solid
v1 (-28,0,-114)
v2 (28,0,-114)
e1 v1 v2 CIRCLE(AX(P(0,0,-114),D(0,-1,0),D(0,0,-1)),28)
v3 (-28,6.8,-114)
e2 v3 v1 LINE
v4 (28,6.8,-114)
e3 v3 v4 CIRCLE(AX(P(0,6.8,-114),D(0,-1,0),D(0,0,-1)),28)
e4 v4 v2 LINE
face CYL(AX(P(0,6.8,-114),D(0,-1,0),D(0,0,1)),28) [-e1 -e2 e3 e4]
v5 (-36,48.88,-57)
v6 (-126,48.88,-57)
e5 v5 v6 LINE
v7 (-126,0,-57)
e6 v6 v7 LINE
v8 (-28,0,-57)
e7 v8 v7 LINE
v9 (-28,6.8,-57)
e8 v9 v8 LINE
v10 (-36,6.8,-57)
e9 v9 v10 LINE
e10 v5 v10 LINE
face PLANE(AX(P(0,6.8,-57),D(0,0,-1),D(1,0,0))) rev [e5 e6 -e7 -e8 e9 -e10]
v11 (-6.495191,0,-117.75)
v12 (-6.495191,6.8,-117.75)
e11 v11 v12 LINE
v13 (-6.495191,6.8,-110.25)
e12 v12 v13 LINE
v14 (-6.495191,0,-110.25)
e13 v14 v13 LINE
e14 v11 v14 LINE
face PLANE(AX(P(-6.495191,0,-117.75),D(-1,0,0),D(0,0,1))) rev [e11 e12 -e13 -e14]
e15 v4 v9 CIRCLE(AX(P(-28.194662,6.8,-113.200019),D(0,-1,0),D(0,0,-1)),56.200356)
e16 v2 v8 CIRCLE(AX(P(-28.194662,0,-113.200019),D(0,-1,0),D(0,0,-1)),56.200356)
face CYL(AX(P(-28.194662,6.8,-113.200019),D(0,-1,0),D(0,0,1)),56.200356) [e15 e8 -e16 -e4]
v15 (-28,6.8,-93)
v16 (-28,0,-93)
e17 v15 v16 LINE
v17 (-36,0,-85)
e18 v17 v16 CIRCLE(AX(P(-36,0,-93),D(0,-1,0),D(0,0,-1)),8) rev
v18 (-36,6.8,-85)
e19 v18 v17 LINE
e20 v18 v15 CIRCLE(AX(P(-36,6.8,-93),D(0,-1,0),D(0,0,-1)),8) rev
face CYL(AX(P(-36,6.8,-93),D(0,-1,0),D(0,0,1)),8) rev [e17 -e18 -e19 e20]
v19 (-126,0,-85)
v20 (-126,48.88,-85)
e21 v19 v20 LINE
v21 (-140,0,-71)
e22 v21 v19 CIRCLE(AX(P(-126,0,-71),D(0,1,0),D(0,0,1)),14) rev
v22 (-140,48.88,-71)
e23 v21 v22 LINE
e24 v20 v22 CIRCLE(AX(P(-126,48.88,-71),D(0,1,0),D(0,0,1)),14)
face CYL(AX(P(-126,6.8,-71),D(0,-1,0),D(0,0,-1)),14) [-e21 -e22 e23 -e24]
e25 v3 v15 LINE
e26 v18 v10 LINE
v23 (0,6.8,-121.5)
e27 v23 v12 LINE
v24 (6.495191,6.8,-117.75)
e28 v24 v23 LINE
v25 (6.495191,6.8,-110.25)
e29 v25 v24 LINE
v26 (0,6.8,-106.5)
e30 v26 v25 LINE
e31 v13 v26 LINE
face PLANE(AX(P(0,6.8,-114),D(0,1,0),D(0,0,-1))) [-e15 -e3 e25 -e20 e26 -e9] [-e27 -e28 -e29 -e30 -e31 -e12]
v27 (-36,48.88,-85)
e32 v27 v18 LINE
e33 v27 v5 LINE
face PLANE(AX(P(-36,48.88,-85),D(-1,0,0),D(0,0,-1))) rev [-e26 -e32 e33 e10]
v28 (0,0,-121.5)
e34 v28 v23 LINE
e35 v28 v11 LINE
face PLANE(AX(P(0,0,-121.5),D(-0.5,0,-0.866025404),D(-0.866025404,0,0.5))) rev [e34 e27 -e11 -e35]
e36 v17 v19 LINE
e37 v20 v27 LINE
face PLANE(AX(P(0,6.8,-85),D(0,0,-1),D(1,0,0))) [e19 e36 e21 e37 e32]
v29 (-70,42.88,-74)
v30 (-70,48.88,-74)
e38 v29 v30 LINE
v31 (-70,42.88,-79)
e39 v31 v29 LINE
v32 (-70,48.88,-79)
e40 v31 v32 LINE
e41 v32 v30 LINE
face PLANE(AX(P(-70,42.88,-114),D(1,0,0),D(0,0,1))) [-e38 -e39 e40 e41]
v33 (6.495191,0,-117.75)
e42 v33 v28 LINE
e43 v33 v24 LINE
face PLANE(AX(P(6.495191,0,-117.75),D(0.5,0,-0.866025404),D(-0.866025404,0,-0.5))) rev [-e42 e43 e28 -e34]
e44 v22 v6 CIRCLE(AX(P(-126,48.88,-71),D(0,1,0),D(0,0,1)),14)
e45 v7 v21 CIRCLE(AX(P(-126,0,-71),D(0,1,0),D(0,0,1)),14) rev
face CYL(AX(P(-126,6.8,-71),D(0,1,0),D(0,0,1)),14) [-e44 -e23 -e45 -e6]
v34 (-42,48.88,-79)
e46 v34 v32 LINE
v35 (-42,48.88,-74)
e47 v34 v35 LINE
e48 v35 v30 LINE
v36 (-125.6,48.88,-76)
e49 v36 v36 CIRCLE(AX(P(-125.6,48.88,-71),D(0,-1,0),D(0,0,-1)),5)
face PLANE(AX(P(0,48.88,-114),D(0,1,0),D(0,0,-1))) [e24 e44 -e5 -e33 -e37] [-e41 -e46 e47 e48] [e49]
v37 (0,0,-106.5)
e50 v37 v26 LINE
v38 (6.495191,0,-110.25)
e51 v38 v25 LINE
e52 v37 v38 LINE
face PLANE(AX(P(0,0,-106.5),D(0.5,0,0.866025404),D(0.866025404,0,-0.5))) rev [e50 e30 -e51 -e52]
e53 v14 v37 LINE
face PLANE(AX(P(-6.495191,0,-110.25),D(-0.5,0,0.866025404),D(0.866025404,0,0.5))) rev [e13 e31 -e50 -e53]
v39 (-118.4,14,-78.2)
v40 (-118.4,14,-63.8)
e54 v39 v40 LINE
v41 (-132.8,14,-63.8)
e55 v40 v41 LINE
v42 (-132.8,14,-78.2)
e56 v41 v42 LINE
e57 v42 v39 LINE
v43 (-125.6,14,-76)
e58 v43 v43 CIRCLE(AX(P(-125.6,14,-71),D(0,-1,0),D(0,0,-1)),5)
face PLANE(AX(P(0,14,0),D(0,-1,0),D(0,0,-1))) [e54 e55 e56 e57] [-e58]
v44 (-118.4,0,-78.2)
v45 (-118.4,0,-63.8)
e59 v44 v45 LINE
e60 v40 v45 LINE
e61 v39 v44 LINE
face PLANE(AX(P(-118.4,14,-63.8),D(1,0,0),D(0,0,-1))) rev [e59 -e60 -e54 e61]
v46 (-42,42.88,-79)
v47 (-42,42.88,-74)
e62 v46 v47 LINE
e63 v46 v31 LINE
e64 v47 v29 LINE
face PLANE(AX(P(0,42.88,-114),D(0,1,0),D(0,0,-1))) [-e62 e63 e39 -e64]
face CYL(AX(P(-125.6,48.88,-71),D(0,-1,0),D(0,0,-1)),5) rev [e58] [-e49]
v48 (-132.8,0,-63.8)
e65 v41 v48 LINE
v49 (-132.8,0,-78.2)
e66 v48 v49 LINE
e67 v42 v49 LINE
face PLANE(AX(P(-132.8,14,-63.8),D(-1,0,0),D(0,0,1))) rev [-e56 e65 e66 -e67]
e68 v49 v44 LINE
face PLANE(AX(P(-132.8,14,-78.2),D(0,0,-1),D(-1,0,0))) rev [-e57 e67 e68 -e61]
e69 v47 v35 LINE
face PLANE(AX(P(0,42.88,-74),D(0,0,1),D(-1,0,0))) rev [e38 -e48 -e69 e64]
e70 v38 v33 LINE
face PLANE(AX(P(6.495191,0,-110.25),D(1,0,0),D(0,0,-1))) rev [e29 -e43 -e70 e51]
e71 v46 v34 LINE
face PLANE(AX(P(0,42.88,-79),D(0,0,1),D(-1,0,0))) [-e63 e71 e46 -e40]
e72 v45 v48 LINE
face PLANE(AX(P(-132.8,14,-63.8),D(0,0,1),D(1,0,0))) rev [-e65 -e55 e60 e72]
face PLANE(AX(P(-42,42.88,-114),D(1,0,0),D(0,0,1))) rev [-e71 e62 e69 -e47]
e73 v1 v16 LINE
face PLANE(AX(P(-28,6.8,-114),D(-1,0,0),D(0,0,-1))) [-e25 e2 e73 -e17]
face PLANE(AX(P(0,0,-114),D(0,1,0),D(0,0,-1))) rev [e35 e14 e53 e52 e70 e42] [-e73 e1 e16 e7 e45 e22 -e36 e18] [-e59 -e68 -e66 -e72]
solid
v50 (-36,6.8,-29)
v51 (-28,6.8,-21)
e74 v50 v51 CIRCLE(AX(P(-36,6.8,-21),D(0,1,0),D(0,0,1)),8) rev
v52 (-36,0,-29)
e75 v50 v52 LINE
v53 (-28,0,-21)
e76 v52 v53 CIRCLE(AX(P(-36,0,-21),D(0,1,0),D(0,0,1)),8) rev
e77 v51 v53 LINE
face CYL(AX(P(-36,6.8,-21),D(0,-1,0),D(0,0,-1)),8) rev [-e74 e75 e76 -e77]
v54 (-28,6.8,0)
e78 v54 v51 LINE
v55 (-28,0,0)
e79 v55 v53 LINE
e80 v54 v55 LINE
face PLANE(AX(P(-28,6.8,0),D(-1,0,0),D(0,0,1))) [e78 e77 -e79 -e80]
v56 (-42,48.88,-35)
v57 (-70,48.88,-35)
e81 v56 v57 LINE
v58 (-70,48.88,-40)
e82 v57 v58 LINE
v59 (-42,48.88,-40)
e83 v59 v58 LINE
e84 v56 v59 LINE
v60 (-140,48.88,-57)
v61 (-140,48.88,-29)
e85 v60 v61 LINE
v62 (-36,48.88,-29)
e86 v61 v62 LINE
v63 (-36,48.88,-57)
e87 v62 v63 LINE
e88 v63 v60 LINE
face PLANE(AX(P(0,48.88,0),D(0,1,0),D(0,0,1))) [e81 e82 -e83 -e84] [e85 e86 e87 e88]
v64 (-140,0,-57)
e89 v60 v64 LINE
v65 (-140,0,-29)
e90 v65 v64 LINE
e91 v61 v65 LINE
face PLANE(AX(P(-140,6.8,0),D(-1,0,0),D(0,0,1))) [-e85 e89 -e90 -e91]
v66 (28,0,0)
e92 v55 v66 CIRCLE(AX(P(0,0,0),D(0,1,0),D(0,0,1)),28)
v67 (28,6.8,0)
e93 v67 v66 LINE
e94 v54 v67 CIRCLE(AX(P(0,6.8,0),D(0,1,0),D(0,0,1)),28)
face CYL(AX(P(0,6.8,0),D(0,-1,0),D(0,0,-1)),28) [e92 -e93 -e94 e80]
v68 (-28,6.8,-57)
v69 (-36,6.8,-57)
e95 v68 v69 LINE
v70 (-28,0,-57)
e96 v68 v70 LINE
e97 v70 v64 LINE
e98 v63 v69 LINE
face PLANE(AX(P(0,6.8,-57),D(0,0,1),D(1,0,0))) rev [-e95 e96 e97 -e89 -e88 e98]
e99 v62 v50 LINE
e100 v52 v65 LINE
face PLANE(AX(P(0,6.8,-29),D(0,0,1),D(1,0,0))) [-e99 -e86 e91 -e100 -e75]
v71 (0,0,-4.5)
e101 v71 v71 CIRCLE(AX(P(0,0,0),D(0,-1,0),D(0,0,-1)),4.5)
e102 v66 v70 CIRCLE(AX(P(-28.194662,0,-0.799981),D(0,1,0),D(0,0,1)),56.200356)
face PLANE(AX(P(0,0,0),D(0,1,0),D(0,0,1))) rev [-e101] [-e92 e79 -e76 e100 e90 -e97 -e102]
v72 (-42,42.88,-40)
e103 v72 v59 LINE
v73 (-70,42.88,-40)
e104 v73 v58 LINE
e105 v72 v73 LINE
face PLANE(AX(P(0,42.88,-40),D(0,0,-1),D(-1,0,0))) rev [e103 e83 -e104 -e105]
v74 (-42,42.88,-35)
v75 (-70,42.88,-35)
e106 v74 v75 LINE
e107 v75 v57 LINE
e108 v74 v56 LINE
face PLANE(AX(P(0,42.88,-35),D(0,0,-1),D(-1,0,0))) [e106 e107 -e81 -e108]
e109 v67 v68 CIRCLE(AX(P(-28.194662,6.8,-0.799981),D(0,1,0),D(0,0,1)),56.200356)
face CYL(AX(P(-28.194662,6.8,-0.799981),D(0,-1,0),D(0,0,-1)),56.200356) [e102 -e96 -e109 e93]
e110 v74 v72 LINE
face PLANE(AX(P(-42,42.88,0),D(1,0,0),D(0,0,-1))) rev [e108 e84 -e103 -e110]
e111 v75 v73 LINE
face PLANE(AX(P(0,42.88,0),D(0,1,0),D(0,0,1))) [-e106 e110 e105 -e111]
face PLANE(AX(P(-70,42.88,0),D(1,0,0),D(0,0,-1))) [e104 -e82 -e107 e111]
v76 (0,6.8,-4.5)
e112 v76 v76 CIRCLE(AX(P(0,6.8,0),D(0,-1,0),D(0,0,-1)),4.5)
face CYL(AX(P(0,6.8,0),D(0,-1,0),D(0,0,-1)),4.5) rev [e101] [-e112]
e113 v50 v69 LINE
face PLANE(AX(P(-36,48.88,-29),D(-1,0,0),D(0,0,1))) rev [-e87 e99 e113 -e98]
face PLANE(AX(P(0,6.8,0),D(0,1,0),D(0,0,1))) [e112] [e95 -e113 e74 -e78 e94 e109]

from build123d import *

# Parameters (mm, degrees)
EXTRUDE_1_DEPTH     = 6.8
SKETCH_3_R          = 4.5
CUT_EXTRUDE_1_DEPTH = 152.311731204
SKETCH_5_W          = 104
SKETCH_5_H          = 28
EXTRUDE_3_DEPTH     = 42.08
SKETCH_6_W          = 28
SKETCH_6_H          = 5
CUT_EXTRUDE_3_DEPTH = 6
CUT_EXTRUDE_4_DEPTH = 204.800702648
SKETCH_8_W          = 14.4
SKETCH_8_H          = 14.4
CUT_EXTRUDE_5_DEPTH = 14
SKETCH_9_R          = 5
CUT_EXTRUDE_6_DEPTH = 203.436692326
FILLET_1_R          = 14


with BuildPart() as part:
    # Эскиз1 → Бобышка-Вытянуть1 (new body)
    with BuildSketch(Plane(origin=(0, 0, 0), x_dir=(1, 0, 0), z_dir=(0, 1, 0))):
        with BuildLine():
            ThreePointArc((-28, 0), (0, -28), (28, 0))
            ThreePointArc((28, 0), (11.895099372, 40.186413418), (-28, 57))
            Line((-28, 57), (-140, 57))
            Line((-140, 57), (-140, 29))
            Line((-140, 29), (-36, 29))
            ThreePointArc((-36, 29), (-30.343145751, 26.656854249), (-28, 21))
            Line((-28, 21), (-28, 0))
        make_face()
    extrude(amount=EXTRUDE_1_DEPTH)

    # Эскиз3 → Вырез-Вытянуть1 (cut, through all)
    with BuildSketch(Plane(origin=(0, 0, 0), x_dir=(-1, 0, 0), z_dir=(0, -1, 0))):
        with Locations(Location((0, 0, 0), (0, 0, 90))):
            Circle(SKETCH_3_R)
    extrude(amount=-CUT_EXTRUDE_1_DEPTH, mode=Mode.SUBTRACT)

    # Эскиз5 → Бобышка-Вытянуть3 (add)
    with BuildSketch(Plane(origin=(0, 6.8, 0), x_dir=(1, 0, 0), z_dir=(0, 1, 0))):
        with Locations((-88, 43)):
            Rectangle(SKETCH_5_W, SKETCH_5_H)
    extrude(amount=EXTRUDE_3_DEPTH)

    # Эскиз6 → Вырез-Вытянуть3 (cut)
    with BuildSketch(Plane(origin=(0, 48.88, 0), x_dir=(1, 0, 0), z_dir=(0, 1, 0))):
        with Locations((-56, 37.5)):
            Rectangle(SKETCH_6_W, SKETCH_6_H)
    extrude(amount=-CUT_EXTRUDE_3_DEPTH, mode=Mode.SUBTRACT)


with BuildPart() as body_2:
    # Зеркальное отражение1: mirrored copy
    add(part.part.mirror(Plane(origin=(0, 6.8, -57), x_dir=(1, 0, 0), z_dir=(0, 0, 1))))

    # Эскиз7 → Вырез-Вытянуть4 (cut, through all)
    with BuildSketch(Plane(origin=(0, 6.8, 0), x_dir=(1, 0, 0), z_dir=(0, 1, 0))):
        Polygon((0, 121.5), (-6.495190528, 117.75), (-6.495190528, 110.25), (0, 106.5), (6.495190528, 110.25), (6.495190528, 117.75), align=None)
    extrude(amount=-CUT_EXTRUDE_4_DEPTH, mode=Mode.SUBTRACT)

    # Эскиз8 → Вырез-Вытянуть5 (cut)
    with BuildSketch(Plane.XZ):
        with Locations((-125.6, -71)):
            Rectangle(SKETCH_8_W, SKETCH_8_H)
    extrude(amount=-CUT_EXTRUDE_5_DEPTH, mode=Mode.SUBTRACT)

    # Эскиз9 → Вырез-Вытянуть6 (cut, through all)
    with BuildSketch(Plane.XZ.offset(-14)):
        with Locations(Location((-125.6, -71, 0), (0, 0, 270))):
            Circle(SKETCH_9_R)
    extrude(amount=-CUT_EXTRUDE_6_DEPTH, mode=Mode.SUBTRACT)

    # Скругление1
    fillet_1_edges = [body_2.edges().sort_by_distance(p)[0] for p in [
        (-140, 24.44, -85),
        (-140, 24.44, -57),
    ]]
    fillet(fillet_1_edges, radius=FILLET_1_R - 0.0001)  # a hair under: the kernel refuses the full size


solid = Compound([part.part, body_2.part])
